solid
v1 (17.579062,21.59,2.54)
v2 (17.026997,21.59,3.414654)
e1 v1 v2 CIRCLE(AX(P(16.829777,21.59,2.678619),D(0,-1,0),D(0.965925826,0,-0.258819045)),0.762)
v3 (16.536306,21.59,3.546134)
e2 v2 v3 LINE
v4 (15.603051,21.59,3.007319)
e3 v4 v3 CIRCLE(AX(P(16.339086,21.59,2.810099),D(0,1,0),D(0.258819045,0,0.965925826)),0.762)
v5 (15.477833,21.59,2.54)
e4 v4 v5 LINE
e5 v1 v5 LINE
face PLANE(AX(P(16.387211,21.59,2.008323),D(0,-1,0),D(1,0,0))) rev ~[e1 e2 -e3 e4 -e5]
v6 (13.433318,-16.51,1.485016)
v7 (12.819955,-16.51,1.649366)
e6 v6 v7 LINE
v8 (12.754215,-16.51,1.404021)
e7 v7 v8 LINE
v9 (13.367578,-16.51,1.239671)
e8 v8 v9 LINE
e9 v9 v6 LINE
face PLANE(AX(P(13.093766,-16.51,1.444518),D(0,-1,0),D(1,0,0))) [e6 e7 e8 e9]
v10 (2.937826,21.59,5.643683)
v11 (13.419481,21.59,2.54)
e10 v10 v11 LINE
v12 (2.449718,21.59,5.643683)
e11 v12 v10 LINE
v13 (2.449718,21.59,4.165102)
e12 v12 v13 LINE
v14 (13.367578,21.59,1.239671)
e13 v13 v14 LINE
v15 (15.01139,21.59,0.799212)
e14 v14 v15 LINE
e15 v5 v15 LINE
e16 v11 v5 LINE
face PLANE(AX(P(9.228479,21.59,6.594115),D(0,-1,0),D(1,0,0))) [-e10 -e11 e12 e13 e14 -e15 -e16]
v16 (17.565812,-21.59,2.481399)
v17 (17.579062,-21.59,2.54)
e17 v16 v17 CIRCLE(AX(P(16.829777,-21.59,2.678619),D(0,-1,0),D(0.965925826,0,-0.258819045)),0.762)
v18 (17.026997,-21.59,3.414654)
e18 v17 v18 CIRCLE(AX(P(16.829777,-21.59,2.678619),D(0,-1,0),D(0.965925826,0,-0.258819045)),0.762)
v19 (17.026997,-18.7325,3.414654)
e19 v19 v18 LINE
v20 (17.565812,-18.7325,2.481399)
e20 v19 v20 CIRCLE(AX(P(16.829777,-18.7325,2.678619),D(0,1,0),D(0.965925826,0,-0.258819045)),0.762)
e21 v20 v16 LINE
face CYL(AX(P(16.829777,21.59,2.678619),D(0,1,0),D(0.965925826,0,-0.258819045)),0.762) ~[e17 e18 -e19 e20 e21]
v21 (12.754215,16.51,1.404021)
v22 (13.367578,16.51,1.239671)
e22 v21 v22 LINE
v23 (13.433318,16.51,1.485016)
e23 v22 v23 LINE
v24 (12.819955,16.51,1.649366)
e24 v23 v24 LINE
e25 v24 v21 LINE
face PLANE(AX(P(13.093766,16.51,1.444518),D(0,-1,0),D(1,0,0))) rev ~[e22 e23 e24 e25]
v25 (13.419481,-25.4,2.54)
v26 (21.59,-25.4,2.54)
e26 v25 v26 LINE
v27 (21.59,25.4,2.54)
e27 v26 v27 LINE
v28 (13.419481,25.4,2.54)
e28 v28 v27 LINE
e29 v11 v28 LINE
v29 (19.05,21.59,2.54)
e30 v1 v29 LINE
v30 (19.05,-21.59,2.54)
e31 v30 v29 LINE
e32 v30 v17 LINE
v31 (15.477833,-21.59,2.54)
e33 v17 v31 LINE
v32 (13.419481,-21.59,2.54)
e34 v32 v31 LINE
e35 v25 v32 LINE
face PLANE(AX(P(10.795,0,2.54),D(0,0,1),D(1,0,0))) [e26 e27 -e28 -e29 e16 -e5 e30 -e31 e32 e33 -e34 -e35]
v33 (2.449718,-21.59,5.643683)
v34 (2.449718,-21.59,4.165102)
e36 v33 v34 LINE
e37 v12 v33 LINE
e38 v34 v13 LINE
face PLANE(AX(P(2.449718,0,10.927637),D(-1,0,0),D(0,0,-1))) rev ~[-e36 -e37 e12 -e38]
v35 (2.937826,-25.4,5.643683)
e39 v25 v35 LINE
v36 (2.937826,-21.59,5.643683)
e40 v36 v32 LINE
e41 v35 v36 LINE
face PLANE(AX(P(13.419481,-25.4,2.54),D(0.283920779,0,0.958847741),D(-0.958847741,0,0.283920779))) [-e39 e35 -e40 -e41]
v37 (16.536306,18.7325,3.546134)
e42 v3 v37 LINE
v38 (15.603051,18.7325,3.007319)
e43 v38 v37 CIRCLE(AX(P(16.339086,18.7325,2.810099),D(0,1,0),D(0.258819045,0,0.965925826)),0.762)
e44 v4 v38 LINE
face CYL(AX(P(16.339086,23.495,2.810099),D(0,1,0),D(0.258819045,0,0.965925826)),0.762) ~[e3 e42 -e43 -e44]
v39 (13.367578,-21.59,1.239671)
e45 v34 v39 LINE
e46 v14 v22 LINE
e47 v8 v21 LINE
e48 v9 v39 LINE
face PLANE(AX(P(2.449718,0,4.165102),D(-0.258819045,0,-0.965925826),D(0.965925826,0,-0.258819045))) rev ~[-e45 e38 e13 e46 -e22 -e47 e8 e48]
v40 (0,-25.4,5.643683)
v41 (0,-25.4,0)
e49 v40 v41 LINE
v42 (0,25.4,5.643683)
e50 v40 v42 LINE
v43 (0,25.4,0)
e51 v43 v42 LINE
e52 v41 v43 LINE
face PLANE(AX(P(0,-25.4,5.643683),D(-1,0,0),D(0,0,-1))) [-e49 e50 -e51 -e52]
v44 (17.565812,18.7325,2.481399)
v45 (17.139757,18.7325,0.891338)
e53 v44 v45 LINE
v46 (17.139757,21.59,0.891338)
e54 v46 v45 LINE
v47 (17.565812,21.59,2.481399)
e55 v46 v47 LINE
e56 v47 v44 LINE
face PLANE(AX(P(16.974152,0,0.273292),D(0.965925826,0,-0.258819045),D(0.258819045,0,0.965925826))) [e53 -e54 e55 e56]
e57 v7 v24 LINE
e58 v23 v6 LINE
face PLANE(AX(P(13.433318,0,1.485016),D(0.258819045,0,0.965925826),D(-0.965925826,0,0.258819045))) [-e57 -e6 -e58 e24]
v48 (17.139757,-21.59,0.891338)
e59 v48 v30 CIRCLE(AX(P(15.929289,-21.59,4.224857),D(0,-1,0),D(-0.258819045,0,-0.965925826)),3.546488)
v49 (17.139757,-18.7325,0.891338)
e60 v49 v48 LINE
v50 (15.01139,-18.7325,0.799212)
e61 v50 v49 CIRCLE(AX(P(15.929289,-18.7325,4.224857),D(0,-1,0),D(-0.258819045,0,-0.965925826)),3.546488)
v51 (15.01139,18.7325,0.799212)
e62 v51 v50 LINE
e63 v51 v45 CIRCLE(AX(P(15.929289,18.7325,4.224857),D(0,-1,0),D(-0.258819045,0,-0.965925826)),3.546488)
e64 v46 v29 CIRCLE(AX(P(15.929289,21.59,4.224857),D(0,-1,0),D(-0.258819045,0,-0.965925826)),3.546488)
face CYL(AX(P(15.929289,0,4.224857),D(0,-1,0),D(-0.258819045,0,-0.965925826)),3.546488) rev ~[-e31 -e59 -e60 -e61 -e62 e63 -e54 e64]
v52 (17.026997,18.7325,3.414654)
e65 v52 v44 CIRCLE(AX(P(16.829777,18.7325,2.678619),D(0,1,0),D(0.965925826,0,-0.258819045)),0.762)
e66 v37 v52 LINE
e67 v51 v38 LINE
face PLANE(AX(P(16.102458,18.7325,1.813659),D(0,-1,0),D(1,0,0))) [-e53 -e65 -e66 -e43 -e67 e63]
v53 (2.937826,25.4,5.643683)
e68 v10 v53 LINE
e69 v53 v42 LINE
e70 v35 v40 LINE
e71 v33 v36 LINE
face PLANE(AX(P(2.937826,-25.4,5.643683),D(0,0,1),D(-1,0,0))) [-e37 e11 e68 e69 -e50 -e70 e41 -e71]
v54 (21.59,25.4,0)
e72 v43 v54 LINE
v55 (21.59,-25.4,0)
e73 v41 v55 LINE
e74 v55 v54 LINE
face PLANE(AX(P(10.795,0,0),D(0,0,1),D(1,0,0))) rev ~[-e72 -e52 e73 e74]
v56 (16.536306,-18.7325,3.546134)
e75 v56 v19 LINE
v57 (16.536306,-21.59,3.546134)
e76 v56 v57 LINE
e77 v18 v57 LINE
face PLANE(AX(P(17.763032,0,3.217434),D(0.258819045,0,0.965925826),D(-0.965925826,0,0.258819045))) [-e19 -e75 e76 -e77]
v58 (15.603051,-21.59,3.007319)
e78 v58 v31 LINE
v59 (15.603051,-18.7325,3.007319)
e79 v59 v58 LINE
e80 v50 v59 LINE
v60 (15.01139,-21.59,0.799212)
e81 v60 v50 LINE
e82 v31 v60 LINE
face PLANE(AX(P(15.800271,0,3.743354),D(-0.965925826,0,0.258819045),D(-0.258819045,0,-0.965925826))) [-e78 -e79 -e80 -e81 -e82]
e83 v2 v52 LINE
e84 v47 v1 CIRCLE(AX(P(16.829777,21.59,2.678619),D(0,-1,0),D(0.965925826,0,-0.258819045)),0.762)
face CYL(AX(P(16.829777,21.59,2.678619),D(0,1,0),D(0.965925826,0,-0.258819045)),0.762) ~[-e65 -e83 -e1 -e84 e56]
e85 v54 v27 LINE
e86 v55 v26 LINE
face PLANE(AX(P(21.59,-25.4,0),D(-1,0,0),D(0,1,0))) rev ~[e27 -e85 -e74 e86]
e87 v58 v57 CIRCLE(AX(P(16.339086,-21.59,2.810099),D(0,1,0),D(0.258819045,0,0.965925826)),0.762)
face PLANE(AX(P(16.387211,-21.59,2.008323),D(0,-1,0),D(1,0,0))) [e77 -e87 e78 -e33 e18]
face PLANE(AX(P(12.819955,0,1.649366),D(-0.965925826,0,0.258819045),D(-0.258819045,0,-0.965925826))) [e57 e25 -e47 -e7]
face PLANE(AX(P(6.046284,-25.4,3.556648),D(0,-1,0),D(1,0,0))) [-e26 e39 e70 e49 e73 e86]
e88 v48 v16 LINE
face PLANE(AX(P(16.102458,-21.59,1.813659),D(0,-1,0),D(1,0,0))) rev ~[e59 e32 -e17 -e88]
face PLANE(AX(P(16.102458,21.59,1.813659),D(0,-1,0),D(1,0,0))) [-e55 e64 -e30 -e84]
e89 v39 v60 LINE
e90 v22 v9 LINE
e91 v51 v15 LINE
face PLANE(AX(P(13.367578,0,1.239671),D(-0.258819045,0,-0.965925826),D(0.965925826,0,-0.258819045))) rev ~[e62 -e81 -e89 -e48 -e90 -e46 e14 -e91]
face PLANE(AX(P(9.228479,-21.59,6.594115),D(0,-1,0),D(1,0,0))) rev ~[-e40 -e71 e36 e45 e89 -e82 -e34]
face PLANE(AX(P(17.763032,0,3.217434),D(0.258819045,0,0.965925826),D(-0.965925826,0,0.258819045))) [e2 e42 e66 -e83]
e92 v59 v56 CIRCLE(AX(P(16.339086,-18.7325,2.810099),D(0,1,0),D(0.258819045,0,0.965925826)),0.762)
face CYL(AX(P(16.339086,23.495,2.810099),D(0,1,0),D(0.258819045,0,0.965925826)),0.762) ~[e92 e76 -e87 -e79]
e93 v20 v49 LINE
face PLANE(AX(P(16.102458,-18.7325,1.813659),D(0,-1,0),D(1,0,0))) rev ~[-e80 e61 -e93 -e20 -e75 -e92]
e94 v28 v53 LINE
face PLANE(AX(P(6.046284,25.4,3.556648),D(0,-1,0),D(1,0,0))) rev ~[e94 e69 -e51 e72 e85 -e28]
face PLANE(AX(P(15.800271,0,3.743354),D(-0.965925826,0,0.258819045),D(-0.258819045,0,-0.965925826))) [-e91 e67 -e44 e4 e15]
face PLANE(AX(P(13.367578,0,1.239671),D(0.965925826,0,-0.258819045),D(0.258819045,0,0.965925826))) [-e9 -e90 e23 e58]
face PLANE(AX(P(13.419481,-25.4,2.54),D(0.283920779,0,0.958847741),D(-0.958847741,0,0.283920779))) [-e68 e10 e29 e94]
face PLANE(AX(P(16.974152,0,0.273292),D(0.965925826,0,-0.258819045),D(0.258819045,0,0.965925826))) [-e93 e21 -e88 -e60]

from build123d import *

# Parameters (mm, degrees)
F0_W        = 21.59
F0_H        = 50.8
F1_DEPTH    = 2.54
F3_DEPTH    = 21.59
F5_DEPTH    = 21.59
F6_T1_DEPTH = 46.99
F6_T3_DEPTH = 43.18
F7_W        = 5.334
F7_H        = 5.212301854
F8_DEPTH    = 18.7325
F10_DEPTH   = 50.8
F12_DEPTH   = 21.59
F14_DEPTH   = 16.51


# Not quite as in the source:
# - a fillet or chamfer that OpenCascade refuses, or shapes differently, is made with other operations: its cross-section is extruded or revolved along the edge and cut away or added


with BuildPart() as f1:
    # F0 (on Top) → F1 (new body)
    with BuildSketch(Plane.XY):
        with Locations((10.795, 0)):
            Rectangle(F0_W, F0_H)
    extrude(amount=F1_DEPTH)

    # F2 (on Front) → F3 (cut, symmetric)
    with BuildSketch(Plane.XZ):
        with BuildLine():
            Line((19.05, 2.54), (13.716, 2.54))
            Line((13.716, 2.54), (13.3675778015, 1.2396706526))
            Line((13.3675778015, 1.2396706526), (15.0113903727, 0.7992124017))
            ThreePointArc((15.0113903727, 0.7992124017), (17.3330984682, 0.9680336444), (19.05, 2.54))
        make_face()
    extrude(amount=F3_DEPTH, both=True, mode=Mode.SUBTRACT)

    # F4 (on Front) → F5 (join, symmetric)
    with BuildSketch(Plane.XZ):
        Polygon((15.8002708221, 3.7433543202), (15.0113903727, 0.7992124017), (16.9741516517, 0.273292102), (17.7630321012, 3.2174340206), align=None)
    extrude(amount=F5_DEPTH, both=True)

    # F6: fillet of radius 0.762 on 2 edges, made by hand

    # F6_s2 → F6_t1 (cut)
    with BuildSketch(Plane.XZ.offset(-23.495)):
        with BuildLine():
            ThreePointArc((16.5363063018, 3.5461342079), (15.9580861894, 3.4700100859), (15.6030507098, 3.0073188406))
            Line((15.6030507098, 3.0073188406), (15.8002708221, 3.7433543202))
            Line((15.8002708221, 3.7433543202), (16.5363063018, 3.5461342079))
        make_face()
    extrude(amount=F6_T1_DEPTH, mode=Mode.SUBTRACT)

    # F6_s4 → F6_t3 (cut)
    with BuildSketch(Plane.XZ.offset(-21.59)):
        with BuildLine():
            ThreePointArc((17.5658119888, 2.4813985409), (17.4896878668, 3.0596186533), (17.0269966215, 3.4146541329))
            Line((17.0269966215, 3.4146541329), (17.7630321012, 3.2174340206))
            Line((17.7630321012, 3.2174340206), (17.5658119888, 2.4813985409))
        make_face()
    extrude(amount=F6_T3_DEPTH, mode=Mode.SUBTRACT)

    # F7 (on Front) → F8 (cut, symmetric)
    with BuildSketch(Plane.XZ):
        with BuildLine():
            Line((19.05, 2.54), (13.716, 2.54))
            Line((13.716, 2.54), (13.3675778015, 1.2396706526))
            Line((13.3675778015, 1.2396706526), (15.0113903727, 0.7992124017))
            ThreePointArc((15.0113903727, 0.7992124017), (17.3330984682, 0.9680336444), (19.05, 2.54))
        make_face()
        with Locations((16.383, 5.146150927)):
            Rectangle(F7_W, F7_H)
    extrude(amount=F8_DEPTH, both=True, mode=Mode.SUBTRACT)

    # F9 (on face) → F10 (join)
    with BuildSketch(Plane.XZ.offset(25.4)):
        Polygon((0, 2.54), (13.4194806689, 2.54), (2.9378255369, 5.6436832687), (0, 5.6436832687), align=None)
    extrude(amount=-F10_DEPTH)

    # F11 (on Front) → F12 (cut, symmetric)
    with BuildSketch(Plane.XZ):
        Polygon((2.4497181869, 4.1651023194), (15.0113903727, 0.7992124017), (15.0113903727, 10.927637258), (2.4497181869, 10.927637258), align=None)
    extrude(amount=F12_DEPTH, both=True, mode=Mode.SUBTRACT)

    # F13 (on Front) → F14 (join, symmetric)
    with BuildSketch(Plane.XZ):
        Polygon((12.7542149018, 1.4040207463), (13.3675778015, 1.2396706526), (13.4333178389, 1.4850158125), (12.8199549392, 1.6493659062), align=None)
    extrude(amount=F14_DEPTH, both=True)


solid = f1.part
